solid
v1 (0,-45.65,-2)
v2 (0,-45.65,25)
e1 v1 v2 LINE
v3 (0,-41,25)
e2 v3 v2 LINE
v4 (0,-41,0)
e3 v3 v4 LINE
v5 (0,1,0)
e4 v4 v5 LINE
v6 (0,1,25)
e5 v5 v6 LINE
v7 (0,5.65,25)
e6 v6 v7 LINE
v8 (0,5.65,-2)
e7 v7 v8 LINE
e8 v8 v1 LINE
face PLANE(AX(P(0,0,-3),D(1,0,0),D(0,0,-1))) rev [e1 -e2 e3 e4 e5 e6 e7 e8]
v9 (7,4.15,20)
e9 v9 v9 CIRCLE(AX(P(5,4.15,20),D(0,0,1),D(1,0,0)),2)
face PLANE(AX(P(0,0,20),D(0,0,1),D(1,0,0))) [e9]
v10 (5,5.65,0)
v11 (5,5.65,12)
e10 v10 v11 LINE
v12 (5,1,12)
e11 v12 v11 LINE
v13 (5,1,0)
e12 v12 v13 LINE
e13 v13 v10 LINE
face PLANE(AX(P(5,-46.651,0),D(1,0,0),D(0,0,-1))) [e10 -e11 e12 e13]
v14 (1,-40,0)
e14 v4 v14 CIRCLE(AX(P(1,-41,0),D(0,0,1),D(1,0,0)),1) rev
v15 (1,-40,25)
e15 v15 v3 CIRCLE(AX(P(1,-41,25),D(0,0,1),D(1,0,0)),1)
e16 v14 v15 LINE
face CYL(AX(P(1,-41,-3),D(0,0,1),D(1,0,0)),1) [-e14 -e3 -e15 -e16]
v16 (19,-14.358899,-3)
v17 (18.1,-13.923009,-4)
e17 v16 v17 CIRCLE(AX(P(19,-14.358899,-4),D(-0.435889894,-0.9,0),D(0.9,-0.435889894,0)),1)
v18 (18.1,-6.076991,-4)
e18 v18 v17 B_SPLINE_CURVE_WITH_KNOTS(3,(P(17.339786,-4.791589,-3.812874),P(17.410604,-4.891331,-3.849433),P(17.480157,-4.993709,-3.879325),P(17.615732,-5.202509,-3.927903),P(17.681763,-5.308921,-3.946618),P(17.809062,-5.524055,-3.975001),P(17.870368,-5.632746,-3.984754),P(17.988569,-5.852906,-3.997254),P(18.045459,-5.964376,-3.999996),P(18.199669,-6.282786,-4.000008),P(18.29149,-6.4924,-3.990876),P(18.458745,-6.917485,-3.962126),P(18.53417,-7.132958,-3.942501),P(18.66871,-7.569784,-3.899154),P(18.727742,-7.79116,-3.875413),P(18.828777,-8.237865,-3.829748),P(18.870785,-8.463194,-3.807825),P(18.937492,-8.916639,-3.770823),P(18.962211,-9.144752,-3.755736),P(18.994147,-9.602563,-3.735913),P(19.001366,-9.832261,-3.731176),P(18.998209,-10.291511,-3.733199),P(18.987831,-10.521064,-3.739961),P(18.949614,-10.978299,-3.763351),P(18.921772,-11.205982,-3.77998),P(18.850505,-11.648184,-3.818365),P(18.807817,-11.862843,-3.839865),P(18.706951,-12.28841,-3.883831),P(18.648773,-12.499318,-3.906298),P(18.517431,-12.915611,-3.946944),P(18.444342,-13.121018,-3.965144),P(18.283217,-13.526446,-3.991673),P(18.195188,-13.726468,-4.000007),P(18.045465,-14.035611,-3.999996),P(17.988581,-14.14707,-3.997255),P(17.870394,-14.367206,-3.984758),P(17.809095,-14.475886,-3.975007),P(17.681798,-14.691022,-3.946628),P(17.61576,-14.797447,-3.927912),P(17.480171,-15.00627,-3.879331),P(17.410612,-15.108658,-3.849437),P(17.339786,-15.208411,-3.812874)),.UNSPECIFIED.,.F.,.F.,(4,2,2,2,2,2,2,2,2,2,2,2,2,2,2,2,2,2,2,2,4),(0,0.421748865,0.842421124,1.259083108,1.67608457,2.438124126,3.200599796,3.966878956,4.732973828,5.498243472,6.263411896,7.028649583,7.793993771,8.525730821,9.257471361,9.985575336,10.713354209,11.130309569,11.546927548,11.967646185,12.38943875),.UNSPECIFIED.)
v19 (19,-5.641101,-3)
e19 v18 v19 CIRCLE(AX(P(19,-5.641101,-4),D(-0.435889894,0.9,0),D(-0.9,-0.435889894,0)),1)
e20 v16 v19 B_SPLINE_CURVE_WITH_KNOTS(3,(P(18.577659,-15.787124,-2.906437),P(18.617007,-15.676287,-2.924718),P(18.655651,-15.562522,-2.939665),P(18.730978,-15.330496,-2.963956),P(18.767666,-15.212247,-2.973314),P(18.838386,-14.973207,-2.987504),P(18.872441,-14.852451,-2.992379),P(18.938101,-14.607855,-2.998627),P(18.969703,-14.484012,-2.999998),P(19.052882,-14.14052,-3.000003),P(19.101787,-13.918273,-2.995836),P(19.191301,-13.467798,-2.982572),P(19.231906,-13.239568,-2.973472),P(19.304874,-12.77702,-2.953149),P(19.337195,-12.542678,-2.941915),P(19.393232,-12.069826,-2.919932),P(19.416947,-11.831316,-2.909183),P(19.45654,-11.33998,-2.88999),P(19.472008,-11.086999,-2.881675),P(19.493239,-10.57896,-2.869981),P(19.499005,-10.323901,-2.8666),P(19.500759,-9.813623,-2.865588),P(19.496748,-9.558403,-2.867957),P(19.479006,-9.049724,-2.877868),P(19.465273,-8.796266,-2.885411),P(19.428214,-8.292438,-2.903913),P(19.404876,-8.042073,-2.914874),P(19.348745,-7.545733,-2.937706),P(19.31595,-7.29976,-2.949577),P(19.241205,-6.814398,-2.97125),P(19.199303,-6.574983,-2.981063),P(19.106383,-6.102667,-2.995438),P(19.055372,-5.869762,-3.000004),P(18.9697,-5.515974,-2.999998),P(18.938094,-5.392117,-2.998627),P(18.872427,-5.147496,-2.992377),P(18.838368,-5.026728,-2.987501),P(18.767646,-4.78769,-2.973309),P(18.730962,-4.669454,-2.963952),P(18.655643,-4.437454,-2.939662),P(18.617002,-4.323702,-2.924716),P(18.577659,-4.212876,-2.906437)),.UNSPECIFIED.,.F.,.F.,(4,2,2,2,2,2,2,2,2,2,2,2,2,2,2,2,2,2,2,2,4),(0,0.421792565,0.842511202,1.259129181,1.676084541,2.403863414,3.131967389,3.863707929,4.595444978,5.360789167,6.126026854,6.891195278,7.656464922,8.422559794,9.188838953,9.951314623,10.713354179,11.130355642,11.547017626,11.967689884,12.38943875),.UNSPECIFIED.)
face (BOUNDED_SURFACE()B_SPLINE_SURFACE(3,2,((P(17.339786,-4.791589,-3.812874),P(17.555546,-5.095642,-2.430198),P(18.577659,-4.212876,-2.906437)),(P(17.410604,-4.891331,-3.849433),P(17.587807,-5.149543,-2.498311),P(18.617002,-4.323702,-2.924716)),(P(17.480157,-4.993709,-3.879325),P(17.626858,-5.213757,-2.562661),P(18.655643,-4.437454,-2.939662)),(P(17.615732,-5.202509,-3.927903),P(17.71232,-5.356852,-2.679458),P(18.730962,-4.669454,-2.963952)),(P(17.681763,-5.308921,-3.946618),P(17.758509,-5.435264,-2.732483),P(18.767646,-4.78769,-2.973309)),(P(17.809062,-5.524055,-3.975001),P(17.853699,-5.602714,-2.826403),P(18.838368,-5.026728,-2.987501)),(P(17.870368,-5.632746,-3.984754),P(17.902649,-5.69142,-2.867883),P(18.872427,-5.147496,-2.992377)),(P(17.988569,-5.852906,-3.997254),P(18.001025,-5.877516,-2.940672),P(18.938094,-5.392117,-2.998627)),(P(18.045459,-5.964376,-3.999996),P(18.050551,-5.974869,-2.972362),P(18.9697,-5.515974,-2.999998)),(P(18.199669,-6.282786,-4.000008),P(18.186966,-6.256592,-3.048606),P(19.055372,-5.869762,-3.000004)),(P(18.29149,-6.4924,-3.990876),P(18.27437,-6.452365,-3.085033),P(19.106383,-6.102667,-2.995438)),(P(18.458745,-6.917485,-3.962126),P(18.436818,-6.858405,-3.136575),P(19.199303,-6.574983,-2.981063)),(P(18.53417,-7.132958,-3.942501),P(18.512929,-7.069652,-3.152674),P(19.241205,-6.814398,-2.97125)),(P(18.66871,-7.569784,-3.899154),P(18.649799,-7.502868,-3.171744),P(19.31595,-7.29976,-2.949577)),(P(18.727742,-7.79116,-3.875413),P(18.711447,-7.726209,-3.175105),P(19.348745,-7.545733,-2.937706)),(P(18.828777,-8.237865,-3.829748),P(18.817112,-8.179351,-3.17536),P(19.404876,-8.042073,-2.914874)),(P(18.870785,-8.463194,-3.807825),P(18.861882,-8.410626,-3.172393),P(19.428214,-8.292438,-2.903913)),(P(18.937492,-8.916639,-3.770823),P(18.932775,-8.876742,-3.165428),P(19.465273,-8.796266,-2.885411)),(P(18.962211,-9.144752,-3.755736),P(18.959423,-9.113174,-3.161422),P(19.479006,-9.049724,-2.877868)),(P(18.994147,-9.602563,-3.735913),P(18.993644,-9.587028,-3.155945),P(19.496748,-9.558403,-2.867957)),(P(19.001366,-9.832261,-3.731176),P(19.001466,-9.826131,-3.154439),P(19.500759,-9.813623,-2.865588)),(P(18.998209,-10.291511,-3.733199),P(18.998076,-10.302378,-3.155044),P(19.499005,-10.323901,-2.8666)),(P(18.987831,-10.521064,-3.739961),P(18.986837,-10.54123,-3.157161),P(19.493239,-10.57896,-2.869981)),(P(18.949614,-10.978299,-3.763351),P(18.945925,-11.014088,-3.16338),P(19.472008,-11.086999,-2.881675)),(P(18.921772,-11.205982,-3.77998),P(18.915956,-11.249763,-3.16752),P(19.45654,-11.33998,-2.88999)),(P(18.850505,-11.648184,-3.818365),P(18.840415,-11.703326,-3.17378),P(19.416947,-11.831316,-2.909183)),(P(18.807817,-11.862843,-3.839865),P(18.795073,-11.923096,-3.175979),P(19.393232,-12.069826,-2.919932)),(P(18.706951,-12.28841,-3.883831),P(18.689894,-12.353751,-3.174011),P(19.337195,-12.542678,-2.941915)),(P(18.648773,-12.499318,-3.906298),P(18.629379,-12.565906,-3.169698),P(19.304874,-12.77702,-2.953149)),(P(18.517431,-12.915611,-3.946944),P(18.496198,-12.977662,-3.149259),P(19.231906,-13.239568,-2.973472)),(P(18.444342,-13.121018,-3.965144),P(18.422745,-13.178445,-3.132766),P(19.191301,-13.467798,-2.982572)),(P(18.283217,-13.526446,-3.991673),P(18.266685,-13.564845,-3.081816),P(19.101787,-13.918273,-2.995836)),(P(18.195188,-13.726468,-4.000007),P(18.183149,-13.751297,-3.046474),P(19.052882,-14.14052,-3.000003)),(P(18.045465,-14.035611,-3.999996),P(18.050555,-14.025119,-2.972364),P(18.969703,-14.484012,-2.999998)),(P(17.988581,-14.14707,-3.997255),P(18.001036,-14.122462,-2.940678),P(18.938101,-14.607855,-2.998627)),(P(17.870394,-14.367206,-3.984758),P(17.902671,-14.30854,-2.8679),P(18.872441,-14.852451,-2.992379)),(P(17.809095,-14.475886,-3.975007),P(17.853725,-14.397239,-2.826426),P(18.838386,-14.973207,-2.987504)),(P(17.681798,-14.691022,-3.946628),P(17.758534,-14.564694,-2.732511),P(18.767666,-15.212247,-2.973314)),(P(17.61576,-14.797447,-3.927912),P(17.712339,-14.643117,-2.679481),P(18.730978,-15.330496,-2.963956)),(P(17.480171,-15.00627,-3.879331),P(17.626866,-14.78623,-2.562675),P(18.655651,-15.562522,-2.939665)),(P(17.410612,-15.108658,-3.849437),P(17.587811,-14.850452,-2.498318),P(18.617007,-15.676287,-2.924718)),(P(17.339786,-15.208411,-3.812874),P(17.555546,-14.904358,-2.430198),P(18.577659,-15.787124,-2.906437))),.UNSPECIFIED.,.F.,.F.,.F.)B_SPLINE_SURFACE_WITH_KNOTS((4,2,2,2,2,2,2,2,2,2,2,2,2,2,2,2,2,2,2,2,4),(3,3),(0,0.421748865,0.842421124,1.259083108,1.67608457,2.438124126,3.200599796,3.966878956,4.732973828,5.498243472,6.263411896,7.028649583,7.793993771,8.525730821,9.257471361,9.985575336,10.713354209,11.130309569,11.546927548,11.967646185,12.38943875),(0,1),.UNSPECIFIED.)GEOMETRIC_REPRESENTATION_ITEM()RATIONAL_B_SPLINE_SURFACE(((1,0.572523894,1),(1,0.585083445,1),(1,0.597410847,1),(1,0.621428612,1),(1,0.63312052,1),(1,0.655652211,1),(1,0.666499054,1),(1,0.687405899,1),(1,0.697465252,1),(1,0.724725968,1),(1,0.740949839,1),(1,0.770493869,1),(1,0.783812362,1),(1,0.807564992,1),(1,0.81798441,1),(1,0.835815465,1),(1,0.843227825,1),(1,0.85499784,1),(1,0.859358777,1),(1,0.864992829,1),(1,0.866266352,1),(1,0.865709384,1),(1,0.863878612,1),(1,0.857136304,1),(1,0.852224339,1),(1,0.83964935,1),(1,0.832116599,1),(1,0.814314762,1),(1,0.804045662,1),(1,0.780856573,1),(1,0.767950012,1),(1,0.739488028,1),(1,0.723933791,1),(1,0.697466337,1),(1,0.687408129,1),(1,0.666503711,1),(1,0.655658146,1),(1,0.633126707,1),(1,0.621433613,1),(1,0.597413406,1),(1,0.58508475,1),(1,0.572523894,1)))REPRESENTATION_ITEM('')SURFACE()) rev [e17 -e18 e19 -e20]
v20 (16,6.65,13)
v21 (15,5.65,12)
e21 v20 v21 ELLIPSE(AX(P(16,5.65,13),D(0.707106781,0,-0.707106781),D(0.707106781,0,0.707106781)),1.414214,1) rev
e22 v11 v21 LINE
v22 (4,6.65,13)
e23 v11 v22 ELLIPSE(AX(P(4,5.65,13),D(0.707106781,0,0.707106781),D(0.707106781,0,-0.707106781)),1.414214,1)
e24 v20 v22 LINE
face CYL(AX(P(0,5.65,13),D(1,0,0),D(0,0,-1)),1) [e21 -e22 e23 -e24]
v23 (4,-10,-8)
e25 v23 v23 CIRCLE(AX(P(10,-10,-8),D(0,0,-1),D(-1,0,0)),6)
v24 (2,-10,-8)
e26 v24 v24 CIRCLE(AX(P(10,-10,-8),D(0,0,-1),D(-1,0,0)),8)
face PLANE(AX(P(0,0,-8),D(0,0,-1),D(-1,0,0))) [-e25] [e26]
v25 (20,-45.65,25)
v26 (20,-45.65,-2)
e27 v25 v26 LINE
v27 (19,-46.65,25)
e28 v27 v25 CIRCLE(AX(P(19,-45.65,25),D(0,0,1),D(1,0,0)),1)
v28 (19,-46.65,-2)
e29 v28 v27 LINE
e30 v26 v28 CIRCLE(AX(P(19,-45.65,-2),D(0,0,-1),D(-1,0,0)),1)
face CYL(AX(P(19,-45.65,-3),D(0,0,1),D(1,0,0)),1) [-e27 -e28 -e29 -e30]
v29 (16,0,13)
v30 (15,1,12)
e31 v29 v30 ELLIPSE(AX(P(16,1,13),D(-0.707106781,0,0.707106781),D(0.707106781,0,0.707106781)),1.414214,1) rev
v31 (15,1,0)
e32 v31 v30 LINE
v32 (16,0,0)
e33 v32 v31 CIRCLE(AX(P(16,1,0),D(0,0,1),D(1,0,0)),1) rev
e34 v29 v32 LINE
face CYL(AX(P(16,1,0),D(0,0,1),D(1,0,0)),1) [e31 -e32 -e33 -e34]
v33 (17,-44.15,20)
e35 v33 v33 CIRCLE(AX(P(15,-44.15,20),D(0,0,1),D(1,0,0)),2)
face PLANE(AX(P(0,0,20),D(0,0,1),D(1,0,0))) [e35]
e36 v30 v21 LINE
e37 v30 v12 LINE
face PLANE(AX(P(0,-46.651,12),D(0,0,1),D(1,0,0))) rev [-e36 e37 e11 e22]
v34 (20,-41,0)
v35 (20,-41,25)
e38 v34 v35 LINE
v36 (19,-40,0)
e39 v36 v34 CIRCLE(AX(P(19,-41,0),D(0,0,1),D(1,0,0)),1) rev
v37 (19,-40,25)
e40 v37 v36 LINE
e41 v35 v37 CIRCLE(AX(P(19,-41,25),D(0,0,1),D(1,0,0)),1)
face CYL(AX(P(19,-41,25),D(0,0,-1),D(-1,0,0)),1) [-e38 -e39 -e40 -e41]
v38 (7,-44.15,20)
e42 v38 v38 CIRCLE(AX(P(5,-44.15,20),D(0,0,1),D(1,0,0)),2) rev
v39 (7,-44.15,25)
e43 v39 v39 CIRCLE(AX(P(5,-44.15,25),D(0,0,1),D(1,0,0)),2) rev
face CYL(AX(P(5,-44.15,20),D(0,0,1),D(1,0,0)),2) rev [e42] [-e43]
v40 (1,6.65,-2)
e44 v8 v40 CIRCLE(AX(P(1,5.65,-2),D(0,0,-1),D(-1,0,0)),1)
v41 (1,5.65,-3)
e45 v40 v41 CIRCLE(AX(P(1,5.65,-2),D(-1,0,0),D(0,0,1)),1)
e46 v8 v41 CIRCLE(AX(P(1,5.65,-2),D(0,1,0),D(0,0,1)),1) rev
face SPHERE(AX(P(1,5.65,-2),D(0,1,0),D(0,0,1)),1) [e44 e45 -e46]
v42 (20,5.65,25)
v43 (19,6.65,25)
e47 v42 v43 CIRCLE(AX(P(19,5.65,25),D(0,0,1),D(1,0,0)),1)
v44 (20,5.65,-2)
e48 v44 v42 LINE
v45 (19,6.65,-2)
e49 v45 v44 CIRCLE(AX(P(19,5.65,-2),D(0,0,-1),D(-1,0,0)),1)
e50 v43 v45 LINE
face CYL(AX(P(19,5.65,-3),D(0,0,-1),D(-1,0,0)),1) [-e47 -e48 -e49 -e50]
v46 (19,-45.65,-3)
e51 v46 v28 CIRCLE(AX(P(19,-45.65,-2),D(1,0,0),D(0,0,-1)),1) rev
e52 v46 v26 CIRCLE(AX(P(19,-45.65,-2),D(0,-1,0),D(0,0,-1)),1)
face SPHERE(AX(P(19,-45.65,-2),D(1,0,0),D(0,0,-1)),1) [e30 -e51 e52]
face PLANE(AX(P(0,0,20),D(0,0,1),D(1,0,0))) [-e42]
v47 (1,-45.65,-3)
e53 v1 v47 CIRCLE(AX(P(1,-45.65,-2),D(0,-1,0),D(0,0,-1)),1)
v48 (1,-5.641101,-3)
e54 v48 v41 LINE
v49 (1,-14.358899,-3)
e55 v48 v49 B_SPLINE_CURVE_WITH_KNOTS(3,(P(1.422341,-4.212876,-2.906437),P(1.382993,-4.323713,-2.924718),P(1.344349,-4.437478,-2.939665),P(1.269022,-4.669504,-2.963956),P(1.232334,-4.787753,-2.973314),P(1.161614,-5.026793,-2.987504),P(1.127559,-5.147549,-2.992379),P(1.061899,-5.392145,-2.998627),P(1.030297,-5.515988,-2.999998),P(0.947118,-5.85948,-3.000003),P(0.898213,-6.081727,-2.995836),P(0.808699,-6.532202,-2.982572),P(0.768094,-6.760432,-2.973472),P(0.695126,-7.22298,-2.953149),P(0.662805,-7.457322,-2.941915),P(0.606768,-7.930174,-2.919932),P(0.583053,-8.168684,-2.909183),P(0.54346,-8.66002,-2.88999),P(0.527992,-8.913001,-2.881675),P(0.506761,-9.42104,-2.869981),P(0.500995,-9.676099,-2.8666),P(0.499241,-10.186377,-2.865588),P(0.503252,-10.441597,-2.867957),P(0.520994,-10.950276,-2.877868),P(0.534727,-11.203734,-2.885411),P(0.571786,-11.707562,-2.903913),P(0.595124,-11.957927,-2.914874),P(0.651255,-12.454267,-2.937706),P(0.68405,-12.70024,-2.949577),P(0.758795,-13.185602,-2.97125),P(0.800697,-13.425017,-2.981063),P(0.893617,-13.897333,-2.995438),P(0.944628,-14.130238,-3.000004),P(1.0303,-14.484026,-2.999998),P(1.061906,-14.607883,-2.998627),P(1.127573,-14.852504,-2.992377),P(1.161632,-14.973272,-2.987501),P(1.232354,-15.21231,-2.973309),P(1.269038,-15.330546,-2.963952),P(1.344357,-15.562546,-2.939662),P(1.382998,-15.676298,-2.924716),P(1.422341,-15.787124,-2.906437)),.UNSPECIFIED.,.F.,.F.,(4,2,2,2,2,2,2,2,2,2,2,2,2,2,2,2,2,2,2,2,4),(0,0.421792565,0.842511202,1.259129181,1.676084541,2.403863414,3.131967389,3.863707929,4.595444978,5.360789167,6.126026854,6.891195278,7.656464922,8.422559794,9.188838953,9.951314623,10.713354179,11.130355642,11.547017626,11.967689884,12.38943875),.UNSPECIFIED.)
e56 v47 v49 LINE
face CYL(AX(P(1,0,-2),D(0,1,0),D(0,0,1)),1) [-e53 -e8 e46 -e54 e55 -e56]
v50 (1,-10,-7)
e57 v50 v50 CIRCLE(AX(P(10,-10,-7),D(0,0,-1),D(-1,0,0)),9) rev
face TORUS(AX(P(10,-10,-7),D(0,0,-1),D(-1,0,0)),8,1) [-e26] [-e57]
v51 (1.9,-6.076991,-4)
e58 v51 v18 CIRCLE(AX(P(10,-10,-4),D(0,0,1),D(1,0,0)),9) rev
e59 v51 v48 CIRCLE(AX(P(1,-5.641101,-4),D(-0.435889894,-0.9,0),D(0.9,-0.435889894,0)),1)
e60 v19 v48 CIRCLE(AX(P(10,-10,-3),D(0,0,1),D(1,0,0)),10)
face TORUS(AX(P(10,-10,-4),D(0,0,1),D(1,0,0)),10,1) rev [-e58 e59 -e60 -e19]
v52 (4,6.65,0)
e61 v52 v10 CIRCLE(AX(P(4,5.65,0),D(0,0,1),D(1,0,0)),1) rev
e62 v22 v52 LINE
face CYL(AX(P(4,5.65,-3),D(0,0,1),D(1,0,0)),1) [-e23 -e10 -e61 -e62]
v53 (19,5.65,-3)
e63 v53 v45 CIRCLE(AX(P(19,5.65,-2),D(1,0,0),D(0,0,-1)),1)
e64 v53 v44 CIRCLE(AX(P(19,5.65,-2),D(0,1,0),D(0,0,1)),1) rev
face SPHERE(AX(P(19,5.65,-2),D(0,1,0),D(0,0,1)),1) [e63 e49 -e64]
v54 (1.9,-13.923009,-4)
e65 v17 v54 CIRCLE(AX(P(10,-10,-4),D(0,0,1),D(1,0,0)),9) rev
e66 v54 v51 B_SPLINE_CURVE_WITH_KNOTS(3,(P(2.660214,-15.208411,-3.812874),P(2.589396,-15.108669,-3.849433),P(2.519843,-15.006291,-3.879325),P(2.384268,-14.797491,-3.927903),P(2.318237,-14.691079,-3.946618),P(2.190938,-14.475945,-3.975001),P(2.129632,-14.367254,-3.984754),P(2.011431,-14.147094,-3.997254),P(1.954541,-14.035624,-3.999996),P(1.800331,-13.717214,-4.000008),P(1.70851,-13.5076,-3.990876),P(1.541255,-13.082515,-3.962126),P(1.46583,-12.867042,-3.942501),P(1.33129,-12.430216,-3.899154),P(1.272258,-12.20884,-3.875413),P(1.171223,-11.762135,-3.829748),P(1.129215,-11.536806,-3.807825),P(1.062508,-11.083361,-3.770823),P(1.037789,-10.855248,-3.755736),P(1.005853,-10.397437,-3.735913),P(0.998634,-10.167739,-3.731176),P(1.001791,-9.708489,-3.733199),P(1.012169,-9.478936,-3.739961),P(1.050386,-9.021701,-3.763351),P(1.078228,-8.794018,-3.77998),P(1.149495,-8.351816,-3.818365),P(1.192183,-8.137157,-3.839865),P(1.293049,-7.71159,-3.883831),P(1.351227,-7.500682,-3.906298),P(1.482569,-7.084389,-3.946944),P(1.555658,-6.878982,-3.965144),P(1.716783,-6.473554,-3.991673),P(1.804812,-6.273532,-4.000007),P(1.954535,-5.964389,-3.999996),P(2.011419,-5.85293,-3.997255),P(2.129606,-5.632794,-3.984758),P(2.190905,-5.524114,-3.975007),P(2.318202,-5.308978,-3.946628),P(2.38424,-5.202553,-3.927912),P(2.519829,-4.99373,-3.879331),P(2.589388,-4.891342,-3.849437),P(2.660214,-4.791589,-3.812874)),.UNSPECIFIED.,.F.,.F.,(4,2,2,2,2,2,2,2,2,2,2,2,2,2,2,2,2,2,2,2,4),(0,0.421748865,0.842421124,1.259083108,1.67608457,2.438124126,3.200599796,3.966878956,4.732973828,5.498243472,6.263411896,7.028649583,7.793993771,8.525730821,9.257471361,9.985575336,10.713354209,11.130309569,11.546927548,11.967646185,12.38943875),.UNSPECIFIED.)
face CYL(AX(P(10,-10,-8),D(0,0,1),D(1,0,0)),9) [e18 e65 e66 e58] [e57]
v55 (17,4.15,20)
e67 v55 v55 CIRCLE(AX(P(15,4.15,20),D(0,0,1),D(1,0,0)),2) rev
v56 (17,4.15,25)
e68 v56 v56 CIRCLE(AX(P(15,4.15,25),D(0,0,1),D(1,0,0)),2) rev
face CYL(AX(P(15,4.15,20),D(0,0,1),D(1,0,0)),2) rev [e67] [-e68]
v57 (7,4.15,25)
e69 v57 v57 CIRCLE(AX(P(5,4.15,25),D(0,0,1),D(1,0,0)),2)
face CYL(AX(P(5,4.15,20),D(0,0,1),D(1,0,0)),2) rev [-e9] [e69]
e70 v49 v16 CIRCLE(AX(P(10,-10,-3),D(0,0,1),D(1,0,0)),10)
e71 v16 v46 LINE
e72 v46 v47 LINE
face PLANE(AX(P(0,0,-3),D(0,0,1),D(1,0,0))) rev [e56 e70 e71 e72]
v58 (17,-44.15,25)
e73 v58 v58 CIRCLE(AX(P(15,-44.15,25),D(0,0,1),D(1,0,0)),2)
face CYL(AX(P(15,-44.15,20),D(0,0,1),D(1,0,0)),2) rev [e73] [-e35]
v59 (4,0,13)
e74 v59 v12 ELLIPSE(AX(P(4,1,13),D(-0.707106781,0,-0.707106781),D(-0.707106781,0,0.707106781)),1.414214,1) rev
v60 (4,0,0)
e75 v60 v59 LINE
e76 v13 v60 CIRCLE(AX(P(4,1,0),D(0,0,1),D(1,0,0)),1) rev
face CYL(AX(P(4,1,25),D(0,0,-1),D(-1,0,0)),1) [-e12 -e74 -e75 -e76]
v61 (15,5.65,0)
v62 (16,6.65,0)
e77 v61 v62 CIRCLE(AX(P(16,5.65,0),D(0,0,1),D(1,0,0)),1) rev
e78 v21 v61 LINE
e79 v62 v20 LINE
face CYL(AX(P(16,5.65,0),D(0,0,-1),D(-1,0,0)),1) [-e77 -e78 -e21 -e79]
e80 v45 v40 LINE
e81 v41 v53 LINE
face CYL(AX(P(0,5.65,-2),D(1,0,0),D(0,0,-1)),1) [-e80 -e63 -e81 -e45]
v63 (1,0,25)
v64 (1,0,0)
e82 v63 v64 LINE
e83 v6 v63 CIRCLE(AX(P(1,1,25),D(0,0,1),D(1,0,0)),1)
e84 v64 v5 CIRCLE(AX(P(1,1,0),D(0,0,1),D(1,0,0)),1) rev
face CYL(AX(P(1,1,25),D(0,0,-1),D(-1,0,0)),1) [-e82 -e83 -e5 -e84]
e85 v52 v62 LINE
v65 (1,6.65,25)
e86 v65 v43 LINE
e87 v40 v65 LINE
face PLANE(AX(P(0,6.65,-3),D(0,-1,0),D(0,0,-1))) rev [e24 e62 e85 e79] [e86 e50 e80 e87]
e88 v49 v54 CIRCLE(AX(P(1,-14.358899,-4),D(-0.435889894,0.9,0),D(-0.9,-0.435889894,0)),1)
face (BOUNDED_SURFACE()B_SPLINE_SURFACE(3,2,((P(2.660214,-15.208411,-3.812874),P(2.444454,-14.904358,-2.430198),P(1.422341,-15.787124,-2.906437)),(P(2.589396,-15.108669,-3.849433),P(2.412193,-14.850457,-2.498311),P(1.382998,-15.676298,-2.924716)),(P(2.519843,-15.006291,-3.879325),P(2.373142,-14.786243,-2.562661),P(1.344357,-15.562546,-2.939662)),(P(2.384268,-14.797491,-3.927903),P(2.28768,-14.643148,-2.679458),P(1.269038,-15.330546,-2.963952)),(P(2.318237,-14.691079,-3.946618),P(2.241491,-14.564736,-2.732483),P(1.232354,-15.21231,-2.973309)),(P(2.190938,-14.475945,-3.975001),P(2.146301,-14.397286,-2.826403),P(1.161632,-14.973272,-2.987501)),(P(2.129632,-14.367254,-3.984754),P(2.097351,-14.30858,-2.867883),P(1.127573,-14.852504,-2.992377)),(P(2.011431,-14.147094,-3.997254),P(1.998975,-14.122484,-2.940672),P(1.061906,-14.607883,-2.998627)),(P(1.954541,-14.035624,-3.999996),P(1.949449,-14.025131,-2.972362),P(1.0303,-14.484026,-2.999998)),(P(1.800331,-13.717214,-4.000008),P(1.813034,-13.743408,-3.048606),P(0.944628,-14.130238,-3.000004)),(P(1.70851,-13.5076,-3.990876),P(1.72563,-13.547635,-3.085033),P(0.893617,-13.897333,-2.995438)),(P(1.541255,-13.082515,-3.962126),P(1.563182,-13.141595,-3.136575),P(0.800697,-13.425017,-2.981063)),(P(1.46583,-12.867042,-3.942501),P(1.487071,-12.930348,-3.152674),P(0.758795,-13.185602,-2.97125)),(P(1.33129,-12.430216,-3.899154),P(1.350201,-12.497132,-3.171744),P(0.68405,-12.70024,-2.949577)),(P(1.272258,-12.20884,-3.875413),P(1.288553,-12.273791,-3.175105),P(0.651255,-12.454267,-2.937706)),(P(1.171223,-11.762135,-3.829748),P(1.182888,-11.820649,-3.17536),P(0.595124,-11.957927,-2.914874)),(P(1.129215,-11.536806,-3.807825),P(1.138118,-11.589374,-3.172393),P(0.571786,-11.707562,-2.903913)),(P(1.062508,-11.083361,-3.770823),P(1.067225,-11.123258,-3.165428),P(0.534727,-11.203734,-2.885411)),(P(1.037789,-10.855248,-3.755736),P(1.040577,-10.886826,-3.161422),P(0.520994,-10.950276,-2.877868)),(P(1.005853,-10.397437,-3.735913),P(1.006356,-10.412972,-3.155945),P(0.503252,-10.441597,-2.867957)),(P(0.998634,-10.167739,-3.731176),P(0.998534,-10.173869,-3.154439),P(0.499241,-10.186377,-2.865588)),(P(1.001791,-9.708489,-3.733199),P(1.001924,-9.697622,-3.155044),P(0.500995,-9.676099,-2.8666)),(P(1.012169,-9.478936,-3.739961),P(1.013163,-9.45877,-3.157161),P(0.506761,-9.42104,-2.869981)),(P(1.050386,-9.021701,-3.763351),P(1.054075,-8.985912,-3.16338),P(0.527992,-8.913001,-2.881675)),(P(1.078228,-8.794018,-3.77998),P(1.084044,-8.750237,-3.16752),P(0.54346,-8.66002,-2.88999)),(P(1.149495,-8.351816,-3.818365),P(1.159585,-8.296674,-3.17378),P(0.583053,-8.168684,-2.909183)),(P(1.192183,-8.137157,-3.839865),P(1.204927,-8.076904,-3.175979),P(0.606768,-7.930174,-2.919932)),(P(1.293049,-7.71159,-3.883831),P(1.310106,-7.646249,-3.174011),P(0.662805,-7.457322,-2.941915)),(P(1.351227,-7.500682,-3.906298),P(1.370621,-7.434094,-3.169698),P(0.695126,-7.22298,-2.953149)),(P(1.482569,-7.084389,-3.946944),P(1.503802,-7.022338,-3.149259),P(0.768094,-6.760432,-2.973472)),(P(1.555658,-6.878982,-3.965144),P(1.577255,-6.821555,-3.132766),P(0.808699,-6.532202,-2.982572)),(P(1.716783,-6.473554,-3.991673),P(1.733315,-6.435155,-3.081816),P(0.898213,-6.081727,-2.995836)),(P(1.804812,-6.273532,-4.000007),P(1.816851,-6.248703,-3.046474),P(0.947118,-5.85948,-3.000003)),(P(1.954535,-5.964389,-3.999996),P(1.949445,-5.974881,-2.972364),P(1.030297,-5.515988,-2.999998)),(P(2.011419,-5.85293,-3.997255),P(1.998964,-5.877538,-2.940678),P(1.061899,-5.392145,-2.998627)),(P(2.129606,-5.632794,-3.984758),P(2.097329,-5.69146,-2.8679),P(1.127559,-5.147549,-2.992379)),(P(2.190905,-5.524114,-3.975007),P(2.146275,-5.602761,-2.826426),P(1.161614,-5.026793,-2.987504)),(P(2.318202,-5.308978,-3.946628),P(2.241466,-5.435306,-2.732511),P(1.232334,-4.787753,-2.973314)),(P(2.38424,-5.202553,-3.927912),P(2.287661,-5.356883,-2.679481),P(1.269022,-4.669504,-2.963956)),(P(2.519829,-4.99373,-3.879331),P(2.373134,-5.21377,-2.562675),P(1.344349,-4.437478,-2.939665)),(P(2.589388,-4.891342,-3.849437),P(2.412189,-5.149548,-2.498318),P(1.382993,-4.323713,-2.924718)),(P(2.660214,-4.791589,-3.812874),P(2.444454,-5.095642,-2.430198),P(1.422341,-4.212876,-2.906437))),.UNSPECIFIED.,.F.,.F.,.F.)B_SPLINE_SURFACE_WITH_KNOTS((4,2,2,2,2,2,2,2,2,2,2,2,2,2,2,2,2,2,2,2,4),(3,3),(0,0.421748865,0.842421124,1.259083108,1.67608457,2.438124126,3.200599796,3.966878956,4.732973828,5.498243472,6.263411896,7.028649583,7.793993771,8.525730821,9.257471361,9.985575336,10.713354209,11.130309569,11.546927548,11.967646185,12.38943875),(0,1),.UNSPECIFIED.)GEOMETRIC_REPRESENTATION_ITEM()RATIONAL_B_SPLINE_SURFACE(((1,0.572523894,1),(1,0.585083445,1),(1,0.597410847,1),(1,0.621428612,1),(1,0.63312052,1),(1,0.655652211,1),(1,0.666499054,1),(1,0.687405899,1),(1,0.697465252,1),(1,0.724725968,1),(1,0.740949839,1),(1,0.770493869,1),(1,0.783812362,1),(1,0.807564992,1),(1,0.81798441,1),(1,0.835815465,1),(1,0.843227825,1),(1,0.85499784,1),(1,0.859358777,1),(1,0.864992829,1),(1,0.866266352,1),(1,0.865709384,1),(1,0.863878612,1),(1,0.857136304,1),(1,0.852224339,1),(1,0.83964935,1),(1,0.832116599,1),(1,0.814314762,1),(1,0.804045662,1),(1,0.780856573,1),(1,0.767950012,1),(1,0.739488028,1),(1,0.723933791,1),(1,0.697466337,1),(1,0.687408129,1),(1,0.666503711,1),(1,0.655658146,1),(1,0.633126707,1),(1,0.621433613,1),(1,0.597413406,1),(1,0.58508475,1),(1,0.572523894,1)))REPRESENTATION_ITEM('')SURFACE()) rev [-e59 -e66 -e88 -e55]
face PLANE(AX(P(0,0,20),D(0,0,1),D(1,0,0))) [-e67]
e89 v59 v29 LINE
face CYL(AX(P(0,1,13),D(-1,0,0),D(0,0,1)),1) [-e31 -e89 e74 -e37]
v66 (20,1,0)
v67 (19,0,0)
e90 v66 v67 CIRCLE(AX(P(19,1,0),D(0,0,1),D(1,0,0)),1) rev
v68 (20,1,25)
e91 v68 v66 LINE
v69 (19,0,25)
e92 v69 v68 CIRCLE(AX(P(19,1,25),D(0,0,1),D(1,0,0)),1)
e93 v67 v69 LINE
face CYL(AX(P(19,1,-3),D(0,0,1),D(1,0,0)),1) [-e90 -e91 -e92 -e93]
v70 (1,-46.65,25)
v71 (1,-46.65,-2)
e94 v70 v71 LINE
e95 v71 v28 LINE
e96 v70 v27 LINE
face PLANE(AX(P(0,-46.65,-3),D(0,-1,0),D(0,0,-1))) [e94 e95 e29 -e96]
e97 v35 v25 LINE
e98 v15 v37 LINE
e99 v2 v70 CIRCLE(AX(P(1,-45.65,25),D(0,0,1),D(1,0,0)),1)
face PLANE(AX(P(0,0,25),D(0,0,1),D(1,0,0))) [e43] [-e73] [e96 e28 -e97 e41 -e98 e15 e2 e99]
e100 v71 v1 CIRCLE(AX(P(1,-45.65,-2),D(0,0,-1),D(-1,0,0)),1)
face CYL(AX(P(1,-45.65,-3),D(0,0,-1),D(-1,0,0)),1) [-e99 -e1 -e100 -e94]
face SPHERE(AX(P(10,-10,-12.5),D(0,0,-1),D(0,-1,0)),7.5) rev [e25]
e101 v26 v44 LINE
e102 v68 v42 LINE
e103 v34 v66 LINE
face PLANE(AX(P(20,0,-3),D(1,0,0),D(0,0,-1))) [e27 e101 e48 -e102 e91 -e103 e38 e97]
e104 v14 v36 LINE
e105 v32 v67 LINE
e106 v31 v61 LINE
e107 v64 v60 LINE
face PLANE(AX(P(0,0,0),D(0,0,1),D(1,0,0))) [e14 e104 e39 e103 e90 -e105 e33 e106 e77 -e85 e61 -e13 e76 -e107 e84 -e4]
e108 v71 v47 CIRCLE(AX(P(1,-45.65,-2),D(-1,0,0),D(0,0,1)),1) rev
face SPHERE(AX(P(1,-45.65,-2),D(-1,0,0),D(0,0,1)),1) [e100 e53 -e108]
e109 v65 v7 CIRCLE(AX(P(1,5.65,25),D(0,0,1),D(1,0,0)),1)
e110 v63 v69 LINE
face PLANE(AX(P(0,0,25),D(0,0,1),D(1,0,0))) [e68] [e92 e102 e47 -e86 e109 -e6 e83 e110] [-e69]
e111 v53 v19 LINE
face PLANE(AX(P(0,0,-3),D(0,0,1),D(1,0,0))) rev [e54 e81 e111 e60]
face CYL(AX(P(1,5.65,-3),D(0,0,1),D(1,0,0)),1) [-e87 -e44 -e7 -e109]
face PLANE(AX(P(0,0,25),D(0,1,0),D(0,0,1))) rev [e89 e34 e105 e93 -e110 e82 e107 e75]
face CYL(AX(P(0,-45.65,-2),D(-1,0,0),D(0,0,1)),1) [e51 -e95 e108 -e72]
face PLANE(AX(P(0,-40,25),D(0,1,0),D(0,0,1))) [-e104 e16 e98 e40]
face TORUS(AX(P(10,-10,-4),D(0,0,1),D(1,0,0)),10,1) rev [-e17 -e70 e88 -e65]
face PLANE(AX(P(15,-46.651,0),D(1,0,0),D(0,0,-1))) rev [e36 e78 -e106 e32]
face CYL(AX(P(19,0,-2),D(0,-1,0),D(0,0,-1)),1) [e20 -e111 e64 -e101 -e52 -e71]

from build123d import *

# Parameters (mm, degrees)
SKETCH1_W           = 20
SKETCH1_H           = 6.65
SKETCH1_H_2         = 20
BOSS_EXTRUDE1_DEPTH = 3
SKETCH1_3_W         = 20
SKETCH1_3_H         = 6.65
BOSS_EXTRUDE2_DEPTH = 25
SKETCH3_R           = 2
CUT_EXTRUDE1_DEPTH  = 5
SKETCH4_R           = 9
BOSS_EXTRUDE3_DEPTH = 5
CUT_EXTRUDE2_REACH  = 64.176
SKETCH6_W           = 5
SKETCH6_H           = 12
FILLET2_R           = 1
FILLET3_R           = 1


with BuildPart() as part:
    # Sketch1 → Boss-Extrude1 (new body)
    with BuildSketch(Plane.XY):
        with Locations((10, 3.325)):
            Rectangle(SKETCH1_W, SKETCH1_H)
        with Locations((10, -10)):
            Rectangle(SKETCH1_W, SKETCH1_H_2)
        with Locations((10, -30)):
            Rectangle(SKETCH1_W, SKETCH1_H_2)
        with Locations((10, -43.325)):
            Rectangle(SKETCH1_W, SKETCH1_H)
    extrude(amount=-BOSS_EXTRUDE1_DEPTH)

    # Sketch1_3 → Boss-Extrude2 (add)
    with BuildSketch(Plane.XY):
        with Locations((10, 3.325)):
            Rectangle(SKETCH1_3_W, SKETCH1_3_H)
        with Locations((10, -43.325)):
            Rectangle(SKETCH1_3_W, SKETCH1_3_H)
    extrude(amount=BOSS_EXTRUDE2_DEPTH)

    # Sketch3 → Cut-Extrude1 (cut)
    with BuildSketch(Plane.XY.offset(25)):
        with BuildLine():
            ThreePointArc((3, 4.15), (3.585786438, 2.735786438), (5, 2.15))
            Line((5, 2.15), (5, 4.15))
            Line((5, 4.15), (3, 4.15))
        make_face()
        with BuildLine():
            Line((5, 4.15), (5, 2.15))
            ThreePointArc((5, 2.15), (6.414213562, 2.735786438), (7, 4.15))
            ThreePointArc((7, 4.15), (5, 6.15), (3, 4.15))
            Line((3, 4.15), (5, 4.15))
        make_face()
        with Locations((15, 4.15)):
            Circle(SKETCH3_R)
        with Locations((5, -44.15)):
            Circle(SKETCH3_R)
        with Locations((15, -44.15)):
            Circle(SKETCH3_R)
    extrude(amount=-CUT_EXTRUDE1_DEPTH, mode=Mode.SUBTRACT)

    # Sketch4 → Boss-Extrude3 (add)
    with BuildSketch(Plane(origin=(0, 0, -3), x_dir=(-1, 0, 0), z_dir=(0, 0, -1))):
        with Locations((-10, -10)):
            Circle(SKETCH4_R)
    extrude(amount=BOSS_EXTRUDE3_DEPTH)

    # Sketch5 → Cut-Revolve1 (revolve, cut)
    with BuildSketch(Plane(origin=(10, 0, 0), x_dir=(0, 0, -1), z_dir=(1, 0, 0)), mode=Mode.PRIVATE) as cut_revolve1_sk:
        with BuildLine():
            ThreePointArc((5, -10), (5.791796068, -6.645898034), (8, -4))
            Line((8, -4), (8, -10))
            Line((8, -10), (5, -10))
        make_face()
    revolve(cut_revolve1_sk.sketch.rotate(Axis((10, -10, -8), (0, 0, 1)), 180), axis=Axis((10, -10, -8), (0, 0, 1)), mode=Mode.SUBTRACT)

    # Sketch6 → Cut-Extrude2 (cut, up to next)
    with BuildSketch(Plane(origin=(0, 6.65, 0), x_dir=(1, 0, 0), z_dir=(0, 1, 0)), mode=Mode.PRIVATE) as cut_extrude2_sk1:
        with Locations((7.5, -6)):
            Rectangle(SKETCH6_W, SKETCH6_H)
    cut_extrude2_tool1 = extrude(cut_extrude2_sk1.sketch, amount=-CUT_EXTRUDE2_REACH, mode=Mode.PRIVATE) & part.part
    # Sketch6 → Cut-Extrude2 (cut, up to next)
    with BuildSketch(Plane(origin=(0, 6.65, 0), x_dir=(1, 0, 0), z_dir=(0, 1, 0)), mode=Mode.PRIVATE) as cut_extrude2_sk2:
        with Locations((12.5, -6)):
            Rectangle(SKETCH6_W, SKETCH6_H)
    cut_extrude2_tool2 = extrude(cut_extrude2_sk2.sketch, amount=-CUT_EXTRUDE2_REACH, mode=Mode.PRIVATE) & part.part
    add(cut_extrude2_tool1.solids().sort_by_distance((7.5, 6.65, 6))[0], mode=Mode.SUBTRACT)
    add(cut_extrude2_tool2.solids().sort_by_distance((12.5, 6.65, 6))[0], mode=Mode.SUBTRACT)

    # Fillet2
    fillet2_edges = [part.edges().sort_by_distance(p)[0] for p in [
        (0, 6.65, 11),
        (20, 6.65, 11),
        (20, -46.65, 11),
        (0, -46.65, 11),
        (10, -46.65, -3),
        (20, -20, -3),
        (0, 0, 12.5),
        (20, 0, 12.5),
        (20, -40, 12.5),
        (0, -40, 12.5),
        (10, 6.65, -3),
        (0, -20, -3),
        (19, -10, -8),
        (10, 6.65, 12),
        (15, 6.65, 6),
        (5, 0, 6),
        (5, 6.65, 6),
        (15, 0, 6),
        (10, 0, 12),
    ]]
    fillet(fillet2_edges, radius=FILLET2_R - 0.0001)  # a hair under: the kernel refuses the full size

    # Fillet3
    fillet3_edges = [part.edges().sort_by_distance(p)[0] for p in [
        (19, -10, -3),
        (19, -10, -3),
    ]]
    fillet(fillet3_edges, radius=FILLET3_R)


solid = part.part
